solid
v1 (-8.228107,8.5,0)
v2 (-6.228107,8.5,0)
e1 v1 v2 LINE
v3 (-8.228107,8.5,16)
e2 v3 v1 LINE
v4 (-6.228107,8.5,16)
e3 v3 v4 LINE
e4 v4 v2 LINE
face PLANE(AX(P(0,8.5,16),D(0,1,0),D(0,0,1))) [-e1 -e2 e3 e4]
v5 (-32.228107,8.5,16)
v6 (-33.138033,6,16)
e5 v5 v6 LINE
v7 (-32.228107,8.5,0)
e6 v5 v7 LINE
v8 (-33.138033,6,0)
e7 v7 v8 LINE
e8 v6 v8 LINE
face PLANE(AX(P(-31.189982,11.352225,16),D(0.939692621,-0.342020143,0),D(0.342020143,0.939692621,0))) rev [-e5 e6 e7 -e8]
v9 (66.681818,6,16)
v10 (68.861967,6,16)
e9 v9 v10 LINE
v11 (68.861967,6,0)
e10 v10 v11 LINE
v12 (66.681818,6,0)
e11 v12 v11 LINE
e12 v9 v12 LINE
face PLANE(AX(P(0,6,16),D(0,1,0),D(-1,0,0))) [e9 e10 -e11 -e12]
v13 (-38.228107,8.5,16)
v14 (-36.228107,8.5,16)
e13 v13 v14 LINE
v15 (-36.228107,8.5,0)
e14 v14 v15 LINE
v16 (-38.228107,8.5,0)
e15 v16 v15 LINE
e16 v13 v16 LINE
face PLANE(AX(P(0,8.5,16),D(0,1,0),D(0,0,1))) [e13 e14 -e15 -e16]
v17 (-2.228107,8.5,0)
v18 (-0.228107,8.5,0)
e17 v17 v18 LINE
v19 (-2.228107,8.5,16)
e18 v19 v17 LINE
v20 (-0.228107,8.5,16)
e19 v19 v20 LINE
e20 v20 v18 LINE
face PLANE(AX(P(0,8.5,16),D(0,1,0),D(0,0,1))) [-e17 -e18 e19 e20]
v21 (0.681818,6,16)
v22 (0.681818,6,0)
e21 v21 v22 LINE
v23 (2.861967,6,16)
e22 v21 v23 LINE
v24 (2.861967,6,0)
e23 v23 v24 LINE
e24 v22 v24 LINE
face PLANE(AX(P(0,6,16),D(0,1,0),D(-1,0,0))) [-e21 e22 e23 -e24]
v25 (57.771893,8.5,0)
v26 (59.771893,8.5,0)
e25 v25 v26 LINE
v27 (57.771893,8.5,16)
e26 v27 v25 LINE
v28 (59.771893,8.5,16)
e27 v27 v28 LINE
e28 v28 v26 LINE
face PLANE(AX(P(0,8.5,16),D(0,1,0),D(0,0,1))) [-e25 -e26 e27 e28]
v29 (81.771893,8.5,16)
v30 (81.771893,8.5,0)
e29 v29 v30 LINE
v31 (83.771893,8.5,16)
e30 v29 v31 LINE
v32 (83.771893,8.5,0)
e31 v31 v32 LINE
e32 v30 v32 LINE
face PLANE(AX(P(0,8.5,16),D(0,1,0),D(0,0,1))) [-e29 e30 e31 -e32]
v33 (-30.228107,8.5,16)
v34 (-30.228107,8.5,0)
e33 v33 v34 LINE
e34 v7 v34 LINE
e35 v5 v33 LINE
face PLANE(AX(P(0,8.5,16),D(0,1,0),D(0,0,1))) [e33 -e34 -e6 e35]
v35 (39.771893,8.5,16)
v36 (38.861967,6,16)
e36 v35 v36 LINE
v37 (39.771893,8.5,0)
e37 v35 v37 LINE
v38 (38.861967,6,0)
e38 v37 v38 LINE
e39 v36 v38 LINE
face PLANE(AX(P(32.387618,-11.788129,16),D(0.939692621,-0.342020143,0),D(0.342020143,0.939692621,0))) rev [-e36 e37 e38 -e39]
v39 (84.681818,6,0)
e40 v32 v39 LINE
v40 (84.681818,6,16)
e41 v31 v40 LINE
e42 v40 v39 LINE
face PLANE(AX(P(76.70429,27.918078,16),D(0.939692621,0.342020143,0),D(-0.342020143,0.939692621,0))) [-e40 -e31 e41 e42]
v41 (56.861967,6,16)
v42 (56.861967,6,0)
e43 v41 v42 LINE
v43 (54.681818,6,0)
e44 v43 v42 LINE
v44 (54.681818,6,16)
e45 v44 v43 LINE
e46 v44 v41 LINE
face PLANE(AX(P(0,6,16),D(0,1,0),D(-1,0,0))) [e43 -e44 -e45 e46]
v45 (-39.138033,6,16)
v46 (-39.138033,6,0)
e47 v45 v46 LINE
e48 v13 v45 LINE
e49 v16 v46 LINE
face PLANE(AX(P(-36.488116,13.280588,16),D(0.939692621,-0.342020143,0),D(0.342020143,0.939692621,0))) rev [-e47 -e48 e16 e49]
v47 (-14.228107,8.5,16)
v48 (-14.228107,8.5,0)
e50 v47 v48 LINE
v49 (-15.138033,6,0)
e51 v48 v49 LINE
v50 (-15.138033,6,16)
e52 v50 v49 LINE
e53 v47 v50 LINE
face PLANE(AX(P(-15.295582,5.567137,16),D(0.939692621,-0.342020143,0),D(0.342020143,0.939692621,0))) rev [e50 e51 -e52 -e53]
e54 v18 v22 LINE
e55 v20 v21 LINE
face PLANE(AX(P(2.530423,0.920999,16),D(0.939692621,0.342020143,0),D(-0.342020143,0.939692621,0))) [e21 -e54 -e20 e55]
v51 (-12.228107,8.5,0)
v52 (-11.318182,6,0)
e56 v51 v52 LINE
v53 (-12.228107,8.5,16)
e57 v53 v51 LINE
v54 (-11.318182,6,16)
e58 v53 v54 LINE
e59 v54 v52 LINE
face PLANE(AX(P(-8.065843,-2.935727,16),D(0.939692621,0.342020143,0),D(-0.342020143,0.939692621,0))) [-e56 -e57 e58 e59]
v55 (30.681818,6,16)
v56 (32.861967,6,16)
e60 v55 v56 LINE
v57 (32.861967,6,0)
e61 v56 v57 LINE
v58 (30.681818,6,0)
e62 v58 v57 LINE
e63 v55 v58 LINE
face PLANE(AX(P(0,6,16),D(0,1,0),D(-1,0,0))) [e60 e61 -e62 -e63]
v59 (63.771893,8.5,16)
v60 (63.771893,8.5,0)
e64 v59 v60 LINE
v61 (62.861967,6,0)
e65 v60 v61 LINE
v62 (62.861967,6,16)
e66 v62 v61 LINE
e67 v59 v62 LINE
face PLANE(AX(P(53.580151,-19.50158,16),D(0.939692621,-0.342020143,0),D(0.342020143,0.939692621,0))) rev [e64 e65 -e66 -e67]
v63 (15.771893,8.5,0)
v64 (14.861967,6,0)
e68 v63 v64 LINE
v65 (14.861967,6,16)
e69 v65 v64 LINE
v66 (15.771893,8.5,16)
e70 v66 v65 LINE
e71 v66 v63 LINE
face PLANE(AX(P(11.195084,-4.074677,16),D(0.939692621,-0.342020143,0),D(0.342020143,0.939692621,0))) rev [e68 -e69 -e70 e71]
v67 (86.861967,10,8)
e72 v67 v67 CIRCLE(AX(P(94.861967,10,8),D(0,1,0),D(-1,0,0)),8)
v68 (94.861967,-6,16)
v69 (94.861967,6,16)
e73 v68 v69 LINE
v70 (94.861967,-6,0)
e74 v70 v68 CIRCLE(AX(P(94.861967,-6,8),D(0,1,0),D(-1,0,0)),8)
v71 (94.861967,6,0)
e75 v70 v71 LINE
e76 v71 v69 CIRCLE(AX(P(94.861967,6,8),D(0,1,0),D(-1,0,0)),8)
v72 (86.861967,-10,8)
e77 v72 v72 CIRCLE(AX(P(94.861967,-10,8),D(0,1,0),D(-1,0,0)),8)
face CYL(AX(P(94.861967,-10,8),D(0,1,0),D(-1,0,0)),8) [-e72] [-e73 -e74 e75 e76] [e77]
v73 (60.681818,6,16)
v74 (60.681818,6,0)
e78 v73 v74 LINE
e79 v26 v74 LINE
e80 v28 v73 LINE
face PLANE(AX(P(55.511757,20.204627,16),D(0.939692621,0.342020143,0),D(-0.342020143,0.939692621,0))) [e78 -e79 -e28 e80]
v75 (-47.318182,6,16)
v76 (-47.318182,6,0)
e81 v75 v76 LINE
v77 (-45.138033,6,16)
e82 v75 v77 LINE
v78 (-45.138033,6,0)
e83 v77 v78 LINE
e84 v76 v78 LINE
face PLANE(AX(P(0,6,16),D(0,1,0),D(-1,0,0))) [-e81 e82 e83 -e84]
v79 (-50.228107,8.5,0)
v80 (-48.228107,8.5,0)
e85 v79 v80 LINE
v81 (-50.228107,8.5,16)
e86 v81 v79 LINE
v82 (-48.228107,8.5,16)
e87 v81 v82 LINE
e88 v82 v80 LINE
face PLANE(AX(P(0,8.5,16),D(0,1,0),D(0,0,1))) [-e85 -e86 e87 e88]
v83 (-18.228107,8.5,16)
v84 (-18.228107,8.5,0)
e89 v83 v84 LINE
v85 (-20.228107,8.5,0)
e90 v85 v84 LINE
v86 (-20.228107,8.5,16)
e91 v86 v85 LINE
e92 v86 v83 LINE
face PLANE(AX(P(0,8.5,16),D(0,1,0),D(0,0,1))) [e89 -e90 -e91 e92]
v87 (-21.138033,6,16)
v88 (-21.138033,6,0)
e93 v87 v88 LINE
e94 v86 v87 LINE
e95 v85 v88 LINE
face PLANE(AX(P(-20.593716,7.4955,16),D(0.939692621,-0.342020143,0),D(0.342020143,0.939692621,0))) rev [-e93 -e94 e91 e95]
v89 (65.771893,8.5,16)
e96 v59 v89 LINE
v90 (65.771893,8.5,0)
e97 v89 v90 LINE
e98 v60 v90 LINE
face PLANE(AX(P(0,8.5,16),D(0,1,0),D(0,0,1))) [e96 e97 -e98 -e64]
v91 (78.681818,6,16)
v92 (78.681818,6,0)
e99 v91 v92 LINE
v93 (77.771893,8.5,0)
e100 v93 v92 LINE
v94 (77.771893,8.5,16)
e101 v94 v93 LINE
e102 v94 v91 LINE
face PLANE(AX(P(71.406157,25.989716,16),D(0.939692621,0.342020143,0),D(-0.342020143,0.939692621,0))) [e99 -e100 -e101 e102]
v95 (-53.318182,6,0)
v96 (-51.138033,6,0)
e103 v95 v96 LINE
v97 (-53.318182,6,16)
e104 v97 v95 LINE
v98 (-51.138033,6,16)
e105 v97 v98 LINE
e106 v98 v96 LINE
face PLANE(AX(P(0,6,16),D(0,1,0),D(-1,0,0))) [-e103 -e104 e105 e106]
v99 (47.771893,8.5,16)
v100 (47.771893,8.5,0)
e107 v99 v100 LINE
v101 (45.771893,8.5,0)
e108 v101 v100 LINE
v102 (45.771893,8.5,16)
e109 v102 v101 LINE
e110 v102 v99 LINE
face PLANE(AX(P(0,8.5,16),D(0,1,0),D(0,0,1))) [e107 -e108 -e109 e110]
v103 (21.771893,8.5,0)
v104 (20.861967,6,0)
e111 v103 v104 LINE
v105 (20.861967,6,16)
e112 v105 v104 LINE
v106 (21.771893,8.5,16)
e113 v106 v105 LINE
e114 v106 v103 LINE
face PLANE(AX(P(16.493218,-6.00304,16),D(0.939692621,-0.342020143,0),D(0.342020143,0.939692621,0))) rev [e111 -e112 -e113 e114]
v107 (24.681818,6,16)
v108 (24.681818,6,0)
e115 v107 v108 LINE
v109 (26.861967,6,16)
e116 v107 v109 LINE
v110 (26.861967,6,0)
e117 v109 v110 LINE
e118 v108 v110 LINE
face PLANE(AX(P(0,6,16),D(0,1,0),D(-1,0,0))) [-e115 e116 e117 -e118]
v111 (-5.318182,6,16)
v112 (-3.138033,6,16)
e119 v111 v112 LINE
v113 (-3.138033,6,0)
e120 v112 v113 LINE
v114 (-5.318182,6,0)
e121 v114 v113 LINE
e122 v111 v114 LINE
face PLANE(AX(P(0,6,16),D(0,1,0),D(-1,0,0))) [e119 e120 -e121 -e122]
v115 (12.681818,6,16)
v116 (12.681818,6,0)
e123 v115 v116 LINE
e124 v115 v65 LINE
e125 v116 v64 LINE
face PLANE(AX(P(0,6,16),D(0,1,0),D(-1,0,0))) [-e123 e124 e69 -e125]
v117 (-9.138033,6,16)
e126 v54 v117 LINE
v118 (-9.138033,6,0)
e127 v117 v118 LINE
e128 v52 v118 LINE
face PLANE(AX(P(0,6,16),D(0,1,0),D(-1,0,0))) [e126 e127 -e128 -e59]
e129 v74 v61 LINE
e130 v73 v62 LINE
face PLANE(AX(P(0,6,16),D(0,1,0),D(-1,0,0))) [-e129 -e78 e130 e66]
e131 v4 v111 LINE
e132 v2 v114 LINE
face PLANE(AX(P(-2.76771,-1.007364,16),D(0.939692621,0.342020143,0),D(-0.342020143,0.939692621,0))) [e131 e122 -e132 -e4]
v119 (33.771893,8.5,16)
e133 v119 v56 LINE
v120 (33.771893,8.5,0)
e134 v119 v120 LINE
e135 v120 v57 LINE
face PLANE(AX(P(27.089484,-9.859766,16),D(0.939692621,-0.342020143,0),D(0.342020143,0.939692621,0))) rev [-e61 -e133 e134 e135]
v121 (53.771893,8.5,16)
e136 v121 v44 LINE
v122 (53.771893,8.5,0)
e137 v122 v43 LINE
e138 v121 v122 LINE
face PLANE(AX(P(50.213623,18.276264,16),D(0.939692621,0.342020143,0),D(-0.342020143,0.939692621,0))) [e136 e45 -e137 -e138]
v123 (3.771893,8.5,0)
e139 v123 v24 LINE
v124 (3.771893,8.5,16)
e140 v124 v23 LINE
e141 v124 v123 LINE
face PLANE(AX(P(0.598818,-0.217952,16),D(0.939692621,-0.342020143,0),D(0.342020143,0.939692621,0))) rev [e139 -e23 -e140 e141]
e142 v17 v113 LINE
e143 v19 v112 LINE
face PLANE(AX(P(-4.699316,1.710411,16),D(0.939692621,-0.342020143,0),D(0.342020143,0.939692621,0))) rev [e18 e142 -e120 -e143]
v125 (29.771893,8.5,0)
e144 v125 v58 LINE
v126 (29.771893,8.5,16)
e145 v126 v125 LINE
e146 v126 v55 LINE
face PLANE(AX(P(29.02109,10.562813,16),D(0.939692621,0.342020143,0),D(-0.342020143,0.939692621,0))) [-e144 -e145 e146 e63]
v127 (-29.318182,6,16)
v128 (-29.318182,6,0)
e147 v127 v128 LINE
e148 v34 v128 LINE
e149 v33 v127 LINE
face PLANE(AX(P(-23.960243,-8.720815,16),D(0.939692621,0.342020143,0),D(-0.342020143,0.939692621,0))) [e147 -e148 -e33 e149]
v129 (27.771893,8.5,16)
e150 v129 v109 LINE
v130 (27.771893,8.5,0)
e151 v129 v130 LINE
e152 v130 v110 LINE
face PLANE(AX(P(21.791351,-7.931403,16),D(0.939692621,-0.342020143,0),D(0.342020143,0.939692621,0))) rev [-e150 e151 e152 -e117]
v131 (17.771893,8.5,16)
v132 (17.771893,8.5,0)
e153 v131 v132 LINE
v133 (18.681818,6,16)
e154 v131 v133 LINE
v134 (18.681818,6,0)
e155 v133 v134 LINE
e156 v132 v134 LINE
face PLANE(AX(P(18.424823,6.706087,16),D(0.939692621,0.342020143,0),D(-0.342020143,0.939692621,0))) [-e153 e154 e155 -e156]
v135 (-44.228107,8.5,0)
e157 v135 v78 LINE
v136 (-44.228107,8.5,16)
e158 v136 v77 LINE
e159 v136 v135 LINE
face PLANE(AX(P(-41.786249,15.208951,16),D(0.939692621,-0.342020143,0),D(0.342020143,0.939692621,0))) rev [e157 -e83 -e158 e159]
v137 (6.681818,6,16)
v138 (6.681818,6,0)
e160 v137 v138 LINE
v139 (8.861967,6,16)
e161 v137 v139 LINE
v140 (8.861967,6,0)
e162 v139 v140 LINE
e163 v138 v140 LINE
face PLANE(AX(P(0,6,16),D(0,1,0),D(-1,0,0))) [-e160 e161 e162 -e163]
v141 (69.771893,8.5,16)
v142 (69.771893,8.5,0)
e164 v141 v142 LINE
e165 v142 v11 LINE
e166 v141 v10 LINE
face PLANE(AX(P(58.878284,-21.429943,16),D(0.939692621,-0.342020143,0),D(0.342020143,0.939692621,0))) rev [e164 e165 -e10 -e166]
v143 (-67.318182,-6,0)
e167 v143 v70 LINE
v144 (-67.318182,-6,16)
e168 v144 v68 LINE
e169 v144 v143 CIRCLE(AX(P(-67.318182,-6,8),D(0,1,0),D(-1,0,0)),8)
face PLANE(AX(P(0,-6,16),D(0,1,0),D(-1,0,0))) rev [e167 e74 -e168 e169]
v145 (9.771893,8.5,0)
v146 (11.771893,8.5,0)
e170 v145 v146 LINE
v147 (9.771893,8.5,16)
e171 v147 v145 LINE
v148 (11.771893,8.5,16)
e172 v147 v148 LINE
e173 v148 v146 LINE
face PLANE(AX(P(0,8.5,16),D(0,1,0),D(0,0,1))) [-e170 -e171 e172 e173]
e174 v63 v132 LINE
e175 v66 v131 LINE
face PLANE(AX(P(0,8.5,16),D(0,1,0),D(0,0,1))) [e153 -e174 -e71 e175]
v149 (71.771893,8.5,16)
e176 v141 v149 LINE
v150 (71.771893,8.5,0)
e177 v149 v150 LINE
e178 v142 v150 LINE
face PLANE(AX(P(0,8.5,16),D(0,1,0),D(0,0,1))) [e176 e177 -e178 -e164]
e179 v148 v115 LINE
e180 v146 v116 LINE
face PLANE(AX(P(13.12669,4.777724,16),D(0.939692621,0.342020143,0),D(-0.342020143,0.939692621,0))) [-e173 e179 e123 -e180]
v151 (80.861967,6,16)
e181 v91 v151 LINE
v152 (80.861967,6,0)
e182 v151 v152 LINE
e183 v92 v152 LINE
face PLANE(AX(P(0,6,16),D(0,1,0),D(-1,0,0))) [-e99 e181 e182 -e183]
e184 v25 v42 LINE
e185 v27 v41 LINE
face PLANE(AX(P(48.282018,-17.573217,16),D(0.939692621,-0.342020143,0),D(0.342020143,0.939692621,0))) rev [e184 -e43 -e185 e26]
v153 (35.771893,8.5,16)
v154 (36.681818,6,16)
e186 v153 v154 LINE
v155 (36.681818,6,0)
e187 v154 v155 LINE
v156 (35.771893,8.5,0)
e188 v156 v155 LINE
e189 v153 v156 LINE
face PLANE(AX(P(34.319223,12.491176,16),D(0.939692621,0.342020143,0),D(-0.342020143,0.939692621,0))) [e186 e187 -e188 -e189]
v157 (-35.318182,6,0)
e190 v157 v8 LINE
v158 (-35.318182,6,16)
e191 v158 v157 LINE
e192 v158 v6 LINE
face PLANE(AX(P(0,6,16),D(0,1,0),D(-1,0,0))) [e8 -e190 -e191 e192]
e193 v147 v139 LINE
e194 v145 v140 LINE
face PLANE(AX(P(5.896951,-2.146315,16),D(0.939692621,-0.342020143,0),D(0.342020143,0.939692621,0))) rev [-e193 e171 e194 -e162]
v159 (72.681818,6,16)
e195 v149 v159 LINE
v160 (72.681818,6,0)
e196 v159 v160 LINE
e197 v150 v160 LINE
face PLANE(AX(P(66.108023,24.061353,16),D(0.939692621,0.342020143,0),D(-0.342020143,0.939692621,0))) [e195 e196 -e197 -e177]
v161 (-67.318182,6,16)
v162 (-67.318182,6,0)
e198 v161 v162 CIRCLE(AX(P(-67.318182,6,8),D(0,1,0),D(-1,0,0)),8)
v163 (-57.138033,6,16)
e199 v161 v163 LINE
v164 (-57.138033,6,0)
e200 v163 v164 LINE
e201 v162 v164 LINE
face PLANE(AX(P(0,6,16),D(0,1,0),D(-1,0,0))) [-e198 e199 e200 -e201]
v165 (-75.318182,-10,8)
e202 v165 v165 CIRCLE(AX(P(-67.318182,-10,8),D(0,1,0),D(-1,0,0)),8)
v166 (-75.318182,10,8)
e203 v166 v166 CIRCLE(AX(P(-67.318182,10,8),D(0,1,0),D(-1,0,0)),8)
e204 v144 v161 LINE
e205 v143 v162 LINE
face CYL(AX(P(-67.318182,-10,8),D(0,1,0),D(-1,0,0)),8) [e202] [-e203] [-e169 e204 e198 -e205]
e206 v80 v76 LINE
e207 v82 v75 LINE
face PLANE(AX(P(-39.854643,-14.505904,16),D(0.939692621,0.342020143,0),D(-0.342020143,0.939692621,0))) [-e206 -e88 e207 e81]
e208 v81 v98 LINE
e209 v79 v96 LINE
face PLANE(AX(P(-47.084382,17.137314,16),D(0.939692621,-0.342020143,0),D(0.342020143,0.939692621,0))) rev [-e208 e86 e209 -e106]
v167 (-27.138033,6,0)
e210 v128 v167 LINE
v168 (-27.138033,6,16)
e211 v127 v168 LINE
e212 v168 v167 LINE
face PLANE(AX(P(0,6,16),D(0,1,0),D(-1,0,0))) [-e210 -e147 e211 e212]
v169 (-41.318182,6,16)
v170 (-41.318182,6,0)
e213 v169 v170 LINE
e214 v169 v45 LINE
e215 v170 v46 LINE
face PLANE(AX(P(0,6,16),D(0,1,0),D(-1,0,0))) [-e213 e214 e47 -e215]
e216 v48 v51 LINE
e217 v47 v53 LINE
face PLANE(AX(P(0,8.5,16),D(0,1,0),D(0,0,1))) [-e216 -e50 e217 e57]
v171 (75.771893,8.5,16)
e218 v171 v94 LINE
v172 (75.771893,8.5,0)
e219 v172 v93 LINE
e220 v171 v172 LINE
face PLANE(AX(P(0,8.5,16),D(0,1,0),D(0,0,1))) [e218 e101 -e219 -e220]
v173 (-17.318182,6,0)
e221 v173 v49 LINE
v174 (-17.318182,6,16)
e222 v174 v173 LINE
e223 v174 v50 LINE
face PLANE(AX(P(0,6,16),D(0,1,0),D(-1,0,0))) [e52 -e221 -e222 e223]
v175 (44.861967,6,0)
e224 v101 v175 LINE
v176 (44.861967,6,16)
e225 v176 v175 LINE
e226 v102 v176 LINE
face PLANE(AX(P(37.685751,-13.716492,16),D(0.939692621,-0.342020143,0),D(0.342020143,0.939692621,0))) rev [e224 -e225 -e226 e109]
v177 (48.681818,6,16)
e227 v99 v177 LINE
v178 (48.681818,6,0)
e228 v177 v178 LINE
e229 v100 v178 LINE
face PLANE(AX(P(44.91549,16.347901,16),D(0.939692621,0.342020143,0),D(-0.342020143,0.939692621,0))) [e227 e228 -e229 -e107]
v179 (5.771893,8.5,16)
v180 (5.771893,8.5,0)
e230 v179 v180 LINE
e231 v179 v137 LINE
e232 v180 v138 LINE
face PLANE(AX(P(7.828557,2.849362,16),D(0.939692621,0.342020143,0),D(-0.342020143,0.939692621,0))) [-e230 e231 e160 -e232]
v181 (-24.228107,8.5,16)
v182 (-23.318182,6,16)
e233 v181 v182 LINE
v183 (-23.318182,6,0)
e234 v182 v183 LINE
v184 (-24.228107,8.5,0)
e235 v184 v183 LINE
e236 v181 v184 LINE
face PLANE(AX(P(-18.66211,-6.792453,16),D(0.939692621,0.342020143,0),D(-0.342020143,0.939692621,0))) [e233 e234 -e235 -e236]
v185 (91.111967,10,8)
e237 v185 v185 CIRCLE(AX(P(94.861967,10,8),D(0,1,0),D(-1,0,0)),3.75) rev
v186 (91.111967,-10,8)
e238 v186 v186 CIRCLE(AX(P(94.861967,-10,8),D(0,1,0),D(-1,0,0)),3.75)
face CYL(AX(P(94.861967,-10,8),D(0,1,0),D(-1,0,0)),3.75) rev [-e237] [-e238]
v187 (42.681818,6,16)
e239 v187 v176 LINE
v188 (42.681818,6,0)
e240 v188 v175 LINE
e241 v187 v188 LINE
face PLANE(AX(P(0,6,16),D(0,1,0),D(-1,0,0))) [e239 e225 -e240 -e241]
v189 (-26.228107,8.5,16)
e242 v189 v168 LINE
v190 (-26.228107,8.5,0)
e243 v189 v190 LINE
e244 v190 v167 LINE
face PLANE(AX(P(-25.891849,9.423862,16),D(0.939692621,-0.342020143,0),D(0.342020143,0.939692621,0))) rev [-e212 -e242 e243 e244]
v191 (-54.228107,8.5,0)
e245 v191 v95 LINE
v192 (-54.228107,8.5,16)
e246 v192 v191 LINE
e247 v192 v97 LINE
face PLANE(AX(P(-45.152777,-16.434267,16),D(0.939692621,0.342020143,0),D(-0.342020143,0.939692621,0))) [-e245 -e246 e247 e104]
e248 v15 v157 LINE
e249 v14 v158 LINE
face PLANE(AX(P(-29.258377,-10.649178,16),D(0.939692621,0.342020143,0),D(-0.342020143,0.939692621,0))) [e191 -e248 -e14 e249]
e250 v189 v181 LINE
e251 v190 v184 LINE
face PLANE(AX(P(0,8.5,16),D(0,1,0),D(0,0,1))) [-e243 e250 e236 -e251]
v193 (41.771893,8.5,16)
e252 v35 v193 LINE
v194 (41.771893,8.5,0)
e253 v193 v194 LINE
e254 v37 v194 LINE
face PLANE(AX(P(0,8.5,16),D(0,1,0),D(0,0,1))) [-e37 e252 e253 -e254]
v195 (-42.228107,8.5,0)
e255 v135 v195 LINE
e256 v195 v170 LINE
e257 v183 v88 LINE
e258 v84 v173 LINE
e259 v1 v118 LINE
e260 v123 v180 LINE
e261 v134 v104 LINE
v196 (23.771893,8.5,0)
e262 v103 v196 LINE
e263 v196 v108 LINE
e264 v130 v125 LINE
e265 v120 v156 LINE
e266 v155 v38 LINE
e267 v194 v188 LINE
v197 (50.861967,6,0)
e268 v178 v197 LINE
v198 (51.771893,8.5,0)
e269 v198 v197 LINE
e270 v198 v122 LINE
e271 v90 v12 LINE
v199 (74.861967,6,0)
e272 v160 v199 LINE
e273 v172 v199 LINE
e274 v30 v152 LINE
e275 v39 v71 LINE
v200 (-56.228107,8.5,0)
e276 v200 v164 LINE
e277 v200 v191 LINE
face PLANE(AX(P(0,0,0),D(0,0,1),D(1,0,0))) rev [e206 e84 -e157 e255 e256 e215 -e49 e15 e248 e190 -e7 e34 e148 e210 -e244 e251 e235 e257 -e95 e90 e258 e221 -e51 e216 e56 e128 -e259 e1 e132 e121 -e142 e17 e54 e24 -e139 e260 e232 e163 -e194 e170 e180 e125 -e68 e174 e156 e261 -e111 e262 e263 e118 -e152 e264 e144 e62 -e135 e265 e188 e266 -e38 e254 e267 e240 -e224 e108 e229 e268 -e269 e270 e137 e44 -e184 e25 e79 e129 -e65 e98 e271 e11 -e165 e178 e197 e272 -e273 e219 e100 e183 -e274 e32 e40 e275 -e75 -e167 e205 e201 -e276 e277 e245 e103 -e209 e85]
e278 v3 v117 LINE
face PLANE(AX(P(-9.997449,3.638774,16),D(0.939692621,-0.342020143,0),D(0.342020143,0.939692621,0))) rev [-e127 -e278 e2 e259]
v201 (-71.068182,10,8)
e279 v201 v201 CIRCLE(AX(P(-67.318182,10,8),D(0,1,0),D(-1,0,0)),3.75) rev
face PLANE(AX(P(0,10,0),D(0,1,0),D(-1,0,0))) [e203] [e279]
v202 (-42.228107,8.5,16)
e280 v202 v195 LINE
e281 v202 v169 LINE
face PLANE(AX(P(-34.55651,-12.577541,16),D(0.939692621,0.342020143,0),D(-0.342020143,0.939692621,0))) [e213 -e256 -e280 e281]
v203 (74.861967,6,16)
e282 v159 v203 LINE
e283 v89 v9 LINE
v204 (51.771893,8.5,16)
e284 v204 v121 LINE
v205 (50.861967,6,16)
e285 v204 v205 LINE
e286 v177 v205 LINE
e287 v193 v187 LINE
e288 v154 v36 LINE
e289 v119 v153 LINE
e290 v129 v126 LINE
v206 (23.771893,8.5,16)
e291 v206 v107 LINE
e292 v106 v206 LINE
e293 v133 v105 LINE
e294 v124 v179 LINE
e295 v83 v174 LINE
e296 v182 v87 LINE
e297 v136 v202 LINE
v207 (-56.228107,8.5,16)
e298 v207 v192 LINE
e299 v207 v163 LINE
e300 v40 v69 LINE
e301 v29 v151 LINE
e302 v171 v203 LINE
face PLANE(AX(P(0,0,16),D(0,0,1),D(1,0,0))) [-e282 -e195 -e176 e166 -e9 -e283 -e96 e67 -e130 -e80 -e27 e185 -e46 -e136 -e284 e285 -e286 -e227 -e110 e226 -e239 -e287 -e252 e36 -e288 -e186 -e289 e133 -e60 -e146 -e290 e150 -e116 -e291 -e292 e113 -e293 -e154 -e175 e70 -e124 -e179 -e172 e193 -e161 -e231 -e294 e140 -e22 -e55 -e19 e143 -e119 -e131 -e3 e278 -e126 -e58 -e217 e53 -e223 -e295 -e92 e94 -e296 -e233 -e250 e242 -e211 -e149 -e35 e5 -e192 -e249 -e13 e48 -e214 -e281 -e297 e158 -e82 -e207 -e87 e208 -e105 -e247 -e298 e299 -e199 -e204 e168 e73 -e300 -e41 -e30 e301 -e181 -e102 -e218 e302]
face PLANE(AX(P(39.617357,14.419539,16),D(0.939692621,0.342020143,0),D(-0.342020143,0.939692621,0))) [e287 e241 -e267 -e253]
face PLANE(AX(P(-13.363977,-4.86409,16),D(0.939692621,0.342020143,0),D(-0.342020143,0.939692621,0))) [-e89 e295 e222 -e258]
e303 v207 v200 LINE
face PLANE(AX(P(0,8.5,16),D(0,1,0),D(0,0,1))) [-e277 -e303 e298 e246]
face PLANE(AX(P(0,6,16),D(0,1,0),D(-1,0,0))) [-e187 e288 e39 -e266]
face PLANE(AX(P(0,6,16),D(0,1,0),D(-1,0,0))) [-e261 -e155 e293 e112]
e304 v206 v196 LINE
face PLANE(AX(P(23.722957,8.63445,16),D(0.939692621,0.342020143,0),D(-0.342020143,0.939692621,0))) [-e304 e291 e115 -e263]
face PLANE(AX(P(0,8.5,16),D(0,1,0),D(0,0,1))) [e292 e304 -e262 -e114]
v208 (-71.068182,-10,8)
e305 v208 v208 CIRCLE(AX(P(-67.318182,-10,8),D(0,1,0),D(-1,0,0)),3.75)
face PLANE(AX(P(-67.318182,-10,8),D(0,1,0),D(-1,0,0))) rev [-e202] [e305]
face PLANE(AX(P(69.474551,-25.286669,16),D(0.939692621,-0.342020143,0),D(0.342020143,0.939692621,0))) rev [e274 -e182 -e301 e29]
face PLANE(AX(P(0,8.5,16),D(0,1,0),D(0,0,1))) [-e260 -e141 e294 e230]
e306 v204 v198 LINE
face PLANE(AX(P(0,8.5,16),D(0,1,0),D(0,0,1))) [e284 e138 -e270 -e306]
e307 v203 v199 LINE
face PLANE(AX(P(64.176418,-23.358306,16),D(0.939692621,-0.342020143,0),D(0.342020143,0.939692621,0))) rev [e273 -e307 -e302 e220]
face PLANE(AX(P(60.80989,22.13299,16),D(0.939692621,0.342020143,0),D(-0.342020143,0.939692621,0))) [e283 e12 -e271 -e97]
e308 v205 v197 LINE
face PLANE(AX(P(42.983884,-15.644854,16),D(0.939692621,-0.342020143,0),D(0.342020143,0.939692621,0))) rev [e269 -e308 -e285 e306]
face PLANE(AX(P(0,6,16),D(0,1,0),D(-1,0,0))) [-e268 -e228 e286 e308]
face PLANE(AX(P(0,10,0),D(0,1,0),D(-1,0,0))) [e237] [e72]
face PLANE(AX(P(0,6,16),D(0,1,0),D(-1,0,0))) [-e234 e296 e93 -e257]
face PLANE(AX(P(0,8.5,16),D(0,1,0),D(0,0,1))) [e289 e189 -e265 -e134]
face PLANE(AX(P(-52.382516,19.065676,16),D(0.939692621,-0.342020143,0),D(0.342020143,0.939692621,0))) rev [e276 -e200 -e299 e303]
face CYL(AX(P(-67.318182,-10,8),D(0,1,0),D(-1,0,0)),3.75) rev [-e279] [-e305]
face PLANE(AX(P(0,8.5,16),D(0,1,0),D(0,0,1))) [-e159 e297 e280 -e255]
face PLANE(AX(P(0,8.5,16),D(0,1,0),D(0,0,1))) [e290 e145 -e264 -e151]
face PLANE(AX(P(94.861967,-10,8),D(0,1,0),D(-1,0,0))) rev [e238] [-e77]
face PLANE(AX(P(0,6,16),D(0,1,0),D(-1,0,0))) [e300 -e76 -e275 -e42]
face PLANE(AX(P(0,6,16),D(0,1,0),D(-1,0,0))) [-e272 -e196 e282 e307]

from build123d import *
from build123d.topology import SkipClean

# Parameters (mm, degrees)
BOSS_EXTRUDE1_DEPTH = 16
SKETCH3_R           = 3.75
CUT_EXTRUDE1_DEPTH  = 16
SKETCH4_R           = 8
SKETCH4_R_2         = 3.75
BOSS_EXTRUDE2_DEPTH = 16
BOSS_EXTRUDE3_START = 4
SKETCH5_R           = 3.75
BOSS_EXTRUDE3_DEPTH = 4
SKETCH6_R           = 8
SKETCH6_R_2         = 3.75
BOSS_EXTRUDE4_DEPTH = 16
SKETCH7_R           = 3.75
CUT_EXTRUDE2_DEPTH  = 16
BOSS_EXTRUDE5_START = 4
SKETCH8_R           = 3.75
BOSS_EXTRUDE5_DEPTH = 4


with BuildPart() as part:
    # Sketch1 → Boss-Extrude1 (new body)
    with BuildSketch(Plane.XY):
        Polygon((83.771892596, 8.5), (81.771892596, 8.5), (80.86196701, 6), (78.681818182, 6), (77.771892596, 8.5), (75.771892596, 8.5), (74.86196701, 6), (72.681818182, 6), (71.771892596, 8.5), (69.771892596, 8.5), (68.86196701, 6), (66.681818182, 6), (65.771892596, 8.5), (63.771892596, 8.5), (62.86196701, 6), (60.681818182, 6), (59.771892596, 8.5), (57.771892596, 8.5), (56.86196701, 6), (54.681818182, 6), (53.771892596, 8.5), (51.771892596, 8.5), (50.86196701, 6), (48.681818182, 6), (47.771892596, 8.5), (45.771892596, 8.5), (44.86196701, 6), (42.681818182, 6), (41.771892596, 8.5), (39.771892596, 8.5), (38.86196701, 6), (36.681818182, 6), (35.771892596, 8.5), (33.771892596, 8.5), (32.86196701, 6), (30.681818182, 6), (29.771892596, 8.5), (27.771892596, 8.5), (26.86196701, 6), (24.681818182, 6), (23.771892596, 8.5), (21.771892596, 8.5), (20.86196701, 6), (18.681818182, 6), (17.771892596, 8.5), (15.771892596, 8.5), (14.86196701, 6), (12.681818182, 6), (11.771892596, 8.5), (9.771892596, 8.5), (8.86196701, 6), (6.681818182, 6), (5.771892596, 8.5), (3.771892596, 8.5), (2.86196701, 6), (0.681818182, 6), (-0.228107404, 8.5), (-2.228107404, 8.5), (-3.13803299, 6), (-5.318181818, 6), (-6.228107404, 8.5), (-8.228107404, 8.5), (-9.13803299, 6), (-11.318181818, 6), (-12.228107404, 8.5), (-14.228107404, 8.5), (-15.13803299, 6), (-17.318181818, 6), (-18.228107404, 8.5), (-20.228107404, 8.5), (-21.13803299, 6), (-23.318181818, 6), (-24.228107404, 8.5), (-26.228107404, 8.5), (-27.13803299, 6), (-29.318181818, 6), (-30.228107404, 8.5), (-32.228107404, 8.5), (-33.13803299, 6), (-35.318181818, 6), (-36.228107404, 8.5), (-38.228107404, 8.5), (-39.13803299, 6), (-41.318181818, 6), (-42.228107404, 8.5), (-44.228107404, 8.5), (-45.13803299, 6), (-47.318181818, 6), (-48.228107404, 8.5), (-50.228107404, 8.5), (-51.13803299, 6), (-53.318181818, 6), (-54.228107404, 8.5), (-56.228107404, 8.5), (-57.13803299, 6), (-75.13803299, 6), (-75.13803299, -6), (102.681818182, -6), (102.681818182, 6), (84.681818182, 6), align=None)
    extrude(amount=BOSS_EXTRUDE1_DEPTH)

    # Sketch3 → Cut-Extrude1 (cut)
    with BuildSketch(Plane(origin=(0, 6, 0), x_dir=(1, 0, 0), z_dir=(0, 1, 0))):
        with BuildLine():
            ThreePointArc((94.86196701, 0), (102.86196701, -8), (94.86196701, -16))
            Line((94.86196701, -16), (91.310905943, -17.982667731))
            Line((91.310905943, -17.982667731), (106.371238817, -17.331958931))
            Line((106.371238817, -17.331958931), (104.42249812, 2.008331966))
            Line((104.42249812, 2.008331966), (94.86196701, 0))
        make_face()
        with Locations((94.86196701, -8)):
            Circle(SKETCH3_R)
    extrude(amount=-CUT_EXTRUDE1_DEPTH, mode=Mode.SUBTRACT)

    # Sketch4 → Boss-Extrude2 (add)
    with SkipClean():  # the faces are left unmerged after this step: merging them gives an invalid solid
        with BuildSketch(Plane(origin=(0, 6, 0), x_dir=(1, 0, 0), z_dir=(0, 1, 0))):
            with Locations((94.86196701, -8)):
                Circle(SKETCH4_R)
            with Locations((94.86196701, -8)):
                Circle(SKETCH4_R_2, mode=Mode.SUBTRACT)
        extrude(amount=-BOSS_EXTRUDE2_DEPTH)

    # Sketch5 → Boss-Extrude3 (add)
    with SkipClean():  # the faces are left unmerged after this step: merging them gives an invalid solid
        with BuildSketch(Plane(origin=(0, 6, 0), x_dir=(1, 0, 0), z_dir=(0, 1, 0)).offset(BOSS_EXTRUDE3_START)):
            with BuildLine():
                ThreePointArc((94.86196701, 0), (86.86196701, -8), (94.86196701, -16))
                ThreePointArc((94.86196701, -16), (100.51882126, -13.656854249), (102.86196701, -8))
                ThreePointArc((102.86196701, -8), (100.51882126, -2.343145751), (94.86196701, 0))
            make_face()
            with Locations((94.86196701, -8)):
                Circle(SKETCH5_R, mode=Mode.SUBTRACT)
        extrude(amount=-BOSS_EXTRUDE3_DEPTH)

    # Sketch6 → Boss-Extrude4 (add)
    with SkipClean():  # the faces are left unmerged after this step: merging them gives an invalid solid
        with BuildSketch(Plane(origin=(0, 6, 0), x_dir=(1, 0, 0), z_dir=(0, 1, 0))):
            with Locations((-67.318181818, -8)):
                Circle(SKETCH6_R)
            with Locations((-67.318181818, -8)):
                Circle(SKETCH6_R_2, mode=Mode.SUBTRACT)
        extrude(amount=-BOSS_EXTRUDE4_DEPTH)

    # Sketch7 → Cut-Extrude2 (cut)
    with SkipClean():  # the faces are left unmerged after this step: merging them gives an invalid solid
        with BuildSketch(Plane(origin=(0, 6, 0), x_dir=(1, 0, 0), z_dir=(0, 1, 0))):
            with BuildLine():
                Line((-67.318181818, 0), (-75.13803299, 0))
                Line((-75.13803299, 0), (-75.13803299, -6.311827124))
                ThreePointArc((-75.13803299, -6.311827124), (-72.342851807, -1.774834018), (-67.318181818, 0))
            make_face()
            with BuildLine():
                ThreePointArc((-67.318181818, -16), (-72.342851807, -14.225165982), (-75.13803299, -9.688172876))
                Line((-75.13803299, -9.688172876), (-75.13803299, -16))
                Line((-75.13803299, -16), (-67.318181818, -16))
            make_face()
            with Locations((-67.318181818, -8)):
                Circle(SKETCH7_R)
        extrude(amount=-CUT_EXTRUDE2_DEPTH, mode=Mode.SUBTRACT)

    # Sketch8 → Boss-Extrude5 (add)
    with SkipClean():  # the faces are left unmerged after this step: merging them gives an invalid solid
        with BuildSketch(Plane(origin=(0, 6, 0), x_dir=(1, 0, 0), z_dir=(0, 1, 0)).offset(BOSS_EXTRUDE5_START)):
            with BuildLine():
                ThreePointArc((-59.318181818, -8), (-61.661327569, -2.343145751), (-67.318181818, 0))
                ThreePointArc((-67.318181818, 0), (-75.318181818, -8), (-67.318181818, -16))
                ThreePointArc((-67.318181818, -16), (-61.661327569, -13.656854249), (-59.318181818, -8))
            make_face()
            with Locations((-67.318181818, -8)):
                Circle(SKETCH8_R, mode=Mode.SUBTRACT)
        extrude(amount=-BOSS_EXTRUDE5_DEPTH)


solid = part.part
